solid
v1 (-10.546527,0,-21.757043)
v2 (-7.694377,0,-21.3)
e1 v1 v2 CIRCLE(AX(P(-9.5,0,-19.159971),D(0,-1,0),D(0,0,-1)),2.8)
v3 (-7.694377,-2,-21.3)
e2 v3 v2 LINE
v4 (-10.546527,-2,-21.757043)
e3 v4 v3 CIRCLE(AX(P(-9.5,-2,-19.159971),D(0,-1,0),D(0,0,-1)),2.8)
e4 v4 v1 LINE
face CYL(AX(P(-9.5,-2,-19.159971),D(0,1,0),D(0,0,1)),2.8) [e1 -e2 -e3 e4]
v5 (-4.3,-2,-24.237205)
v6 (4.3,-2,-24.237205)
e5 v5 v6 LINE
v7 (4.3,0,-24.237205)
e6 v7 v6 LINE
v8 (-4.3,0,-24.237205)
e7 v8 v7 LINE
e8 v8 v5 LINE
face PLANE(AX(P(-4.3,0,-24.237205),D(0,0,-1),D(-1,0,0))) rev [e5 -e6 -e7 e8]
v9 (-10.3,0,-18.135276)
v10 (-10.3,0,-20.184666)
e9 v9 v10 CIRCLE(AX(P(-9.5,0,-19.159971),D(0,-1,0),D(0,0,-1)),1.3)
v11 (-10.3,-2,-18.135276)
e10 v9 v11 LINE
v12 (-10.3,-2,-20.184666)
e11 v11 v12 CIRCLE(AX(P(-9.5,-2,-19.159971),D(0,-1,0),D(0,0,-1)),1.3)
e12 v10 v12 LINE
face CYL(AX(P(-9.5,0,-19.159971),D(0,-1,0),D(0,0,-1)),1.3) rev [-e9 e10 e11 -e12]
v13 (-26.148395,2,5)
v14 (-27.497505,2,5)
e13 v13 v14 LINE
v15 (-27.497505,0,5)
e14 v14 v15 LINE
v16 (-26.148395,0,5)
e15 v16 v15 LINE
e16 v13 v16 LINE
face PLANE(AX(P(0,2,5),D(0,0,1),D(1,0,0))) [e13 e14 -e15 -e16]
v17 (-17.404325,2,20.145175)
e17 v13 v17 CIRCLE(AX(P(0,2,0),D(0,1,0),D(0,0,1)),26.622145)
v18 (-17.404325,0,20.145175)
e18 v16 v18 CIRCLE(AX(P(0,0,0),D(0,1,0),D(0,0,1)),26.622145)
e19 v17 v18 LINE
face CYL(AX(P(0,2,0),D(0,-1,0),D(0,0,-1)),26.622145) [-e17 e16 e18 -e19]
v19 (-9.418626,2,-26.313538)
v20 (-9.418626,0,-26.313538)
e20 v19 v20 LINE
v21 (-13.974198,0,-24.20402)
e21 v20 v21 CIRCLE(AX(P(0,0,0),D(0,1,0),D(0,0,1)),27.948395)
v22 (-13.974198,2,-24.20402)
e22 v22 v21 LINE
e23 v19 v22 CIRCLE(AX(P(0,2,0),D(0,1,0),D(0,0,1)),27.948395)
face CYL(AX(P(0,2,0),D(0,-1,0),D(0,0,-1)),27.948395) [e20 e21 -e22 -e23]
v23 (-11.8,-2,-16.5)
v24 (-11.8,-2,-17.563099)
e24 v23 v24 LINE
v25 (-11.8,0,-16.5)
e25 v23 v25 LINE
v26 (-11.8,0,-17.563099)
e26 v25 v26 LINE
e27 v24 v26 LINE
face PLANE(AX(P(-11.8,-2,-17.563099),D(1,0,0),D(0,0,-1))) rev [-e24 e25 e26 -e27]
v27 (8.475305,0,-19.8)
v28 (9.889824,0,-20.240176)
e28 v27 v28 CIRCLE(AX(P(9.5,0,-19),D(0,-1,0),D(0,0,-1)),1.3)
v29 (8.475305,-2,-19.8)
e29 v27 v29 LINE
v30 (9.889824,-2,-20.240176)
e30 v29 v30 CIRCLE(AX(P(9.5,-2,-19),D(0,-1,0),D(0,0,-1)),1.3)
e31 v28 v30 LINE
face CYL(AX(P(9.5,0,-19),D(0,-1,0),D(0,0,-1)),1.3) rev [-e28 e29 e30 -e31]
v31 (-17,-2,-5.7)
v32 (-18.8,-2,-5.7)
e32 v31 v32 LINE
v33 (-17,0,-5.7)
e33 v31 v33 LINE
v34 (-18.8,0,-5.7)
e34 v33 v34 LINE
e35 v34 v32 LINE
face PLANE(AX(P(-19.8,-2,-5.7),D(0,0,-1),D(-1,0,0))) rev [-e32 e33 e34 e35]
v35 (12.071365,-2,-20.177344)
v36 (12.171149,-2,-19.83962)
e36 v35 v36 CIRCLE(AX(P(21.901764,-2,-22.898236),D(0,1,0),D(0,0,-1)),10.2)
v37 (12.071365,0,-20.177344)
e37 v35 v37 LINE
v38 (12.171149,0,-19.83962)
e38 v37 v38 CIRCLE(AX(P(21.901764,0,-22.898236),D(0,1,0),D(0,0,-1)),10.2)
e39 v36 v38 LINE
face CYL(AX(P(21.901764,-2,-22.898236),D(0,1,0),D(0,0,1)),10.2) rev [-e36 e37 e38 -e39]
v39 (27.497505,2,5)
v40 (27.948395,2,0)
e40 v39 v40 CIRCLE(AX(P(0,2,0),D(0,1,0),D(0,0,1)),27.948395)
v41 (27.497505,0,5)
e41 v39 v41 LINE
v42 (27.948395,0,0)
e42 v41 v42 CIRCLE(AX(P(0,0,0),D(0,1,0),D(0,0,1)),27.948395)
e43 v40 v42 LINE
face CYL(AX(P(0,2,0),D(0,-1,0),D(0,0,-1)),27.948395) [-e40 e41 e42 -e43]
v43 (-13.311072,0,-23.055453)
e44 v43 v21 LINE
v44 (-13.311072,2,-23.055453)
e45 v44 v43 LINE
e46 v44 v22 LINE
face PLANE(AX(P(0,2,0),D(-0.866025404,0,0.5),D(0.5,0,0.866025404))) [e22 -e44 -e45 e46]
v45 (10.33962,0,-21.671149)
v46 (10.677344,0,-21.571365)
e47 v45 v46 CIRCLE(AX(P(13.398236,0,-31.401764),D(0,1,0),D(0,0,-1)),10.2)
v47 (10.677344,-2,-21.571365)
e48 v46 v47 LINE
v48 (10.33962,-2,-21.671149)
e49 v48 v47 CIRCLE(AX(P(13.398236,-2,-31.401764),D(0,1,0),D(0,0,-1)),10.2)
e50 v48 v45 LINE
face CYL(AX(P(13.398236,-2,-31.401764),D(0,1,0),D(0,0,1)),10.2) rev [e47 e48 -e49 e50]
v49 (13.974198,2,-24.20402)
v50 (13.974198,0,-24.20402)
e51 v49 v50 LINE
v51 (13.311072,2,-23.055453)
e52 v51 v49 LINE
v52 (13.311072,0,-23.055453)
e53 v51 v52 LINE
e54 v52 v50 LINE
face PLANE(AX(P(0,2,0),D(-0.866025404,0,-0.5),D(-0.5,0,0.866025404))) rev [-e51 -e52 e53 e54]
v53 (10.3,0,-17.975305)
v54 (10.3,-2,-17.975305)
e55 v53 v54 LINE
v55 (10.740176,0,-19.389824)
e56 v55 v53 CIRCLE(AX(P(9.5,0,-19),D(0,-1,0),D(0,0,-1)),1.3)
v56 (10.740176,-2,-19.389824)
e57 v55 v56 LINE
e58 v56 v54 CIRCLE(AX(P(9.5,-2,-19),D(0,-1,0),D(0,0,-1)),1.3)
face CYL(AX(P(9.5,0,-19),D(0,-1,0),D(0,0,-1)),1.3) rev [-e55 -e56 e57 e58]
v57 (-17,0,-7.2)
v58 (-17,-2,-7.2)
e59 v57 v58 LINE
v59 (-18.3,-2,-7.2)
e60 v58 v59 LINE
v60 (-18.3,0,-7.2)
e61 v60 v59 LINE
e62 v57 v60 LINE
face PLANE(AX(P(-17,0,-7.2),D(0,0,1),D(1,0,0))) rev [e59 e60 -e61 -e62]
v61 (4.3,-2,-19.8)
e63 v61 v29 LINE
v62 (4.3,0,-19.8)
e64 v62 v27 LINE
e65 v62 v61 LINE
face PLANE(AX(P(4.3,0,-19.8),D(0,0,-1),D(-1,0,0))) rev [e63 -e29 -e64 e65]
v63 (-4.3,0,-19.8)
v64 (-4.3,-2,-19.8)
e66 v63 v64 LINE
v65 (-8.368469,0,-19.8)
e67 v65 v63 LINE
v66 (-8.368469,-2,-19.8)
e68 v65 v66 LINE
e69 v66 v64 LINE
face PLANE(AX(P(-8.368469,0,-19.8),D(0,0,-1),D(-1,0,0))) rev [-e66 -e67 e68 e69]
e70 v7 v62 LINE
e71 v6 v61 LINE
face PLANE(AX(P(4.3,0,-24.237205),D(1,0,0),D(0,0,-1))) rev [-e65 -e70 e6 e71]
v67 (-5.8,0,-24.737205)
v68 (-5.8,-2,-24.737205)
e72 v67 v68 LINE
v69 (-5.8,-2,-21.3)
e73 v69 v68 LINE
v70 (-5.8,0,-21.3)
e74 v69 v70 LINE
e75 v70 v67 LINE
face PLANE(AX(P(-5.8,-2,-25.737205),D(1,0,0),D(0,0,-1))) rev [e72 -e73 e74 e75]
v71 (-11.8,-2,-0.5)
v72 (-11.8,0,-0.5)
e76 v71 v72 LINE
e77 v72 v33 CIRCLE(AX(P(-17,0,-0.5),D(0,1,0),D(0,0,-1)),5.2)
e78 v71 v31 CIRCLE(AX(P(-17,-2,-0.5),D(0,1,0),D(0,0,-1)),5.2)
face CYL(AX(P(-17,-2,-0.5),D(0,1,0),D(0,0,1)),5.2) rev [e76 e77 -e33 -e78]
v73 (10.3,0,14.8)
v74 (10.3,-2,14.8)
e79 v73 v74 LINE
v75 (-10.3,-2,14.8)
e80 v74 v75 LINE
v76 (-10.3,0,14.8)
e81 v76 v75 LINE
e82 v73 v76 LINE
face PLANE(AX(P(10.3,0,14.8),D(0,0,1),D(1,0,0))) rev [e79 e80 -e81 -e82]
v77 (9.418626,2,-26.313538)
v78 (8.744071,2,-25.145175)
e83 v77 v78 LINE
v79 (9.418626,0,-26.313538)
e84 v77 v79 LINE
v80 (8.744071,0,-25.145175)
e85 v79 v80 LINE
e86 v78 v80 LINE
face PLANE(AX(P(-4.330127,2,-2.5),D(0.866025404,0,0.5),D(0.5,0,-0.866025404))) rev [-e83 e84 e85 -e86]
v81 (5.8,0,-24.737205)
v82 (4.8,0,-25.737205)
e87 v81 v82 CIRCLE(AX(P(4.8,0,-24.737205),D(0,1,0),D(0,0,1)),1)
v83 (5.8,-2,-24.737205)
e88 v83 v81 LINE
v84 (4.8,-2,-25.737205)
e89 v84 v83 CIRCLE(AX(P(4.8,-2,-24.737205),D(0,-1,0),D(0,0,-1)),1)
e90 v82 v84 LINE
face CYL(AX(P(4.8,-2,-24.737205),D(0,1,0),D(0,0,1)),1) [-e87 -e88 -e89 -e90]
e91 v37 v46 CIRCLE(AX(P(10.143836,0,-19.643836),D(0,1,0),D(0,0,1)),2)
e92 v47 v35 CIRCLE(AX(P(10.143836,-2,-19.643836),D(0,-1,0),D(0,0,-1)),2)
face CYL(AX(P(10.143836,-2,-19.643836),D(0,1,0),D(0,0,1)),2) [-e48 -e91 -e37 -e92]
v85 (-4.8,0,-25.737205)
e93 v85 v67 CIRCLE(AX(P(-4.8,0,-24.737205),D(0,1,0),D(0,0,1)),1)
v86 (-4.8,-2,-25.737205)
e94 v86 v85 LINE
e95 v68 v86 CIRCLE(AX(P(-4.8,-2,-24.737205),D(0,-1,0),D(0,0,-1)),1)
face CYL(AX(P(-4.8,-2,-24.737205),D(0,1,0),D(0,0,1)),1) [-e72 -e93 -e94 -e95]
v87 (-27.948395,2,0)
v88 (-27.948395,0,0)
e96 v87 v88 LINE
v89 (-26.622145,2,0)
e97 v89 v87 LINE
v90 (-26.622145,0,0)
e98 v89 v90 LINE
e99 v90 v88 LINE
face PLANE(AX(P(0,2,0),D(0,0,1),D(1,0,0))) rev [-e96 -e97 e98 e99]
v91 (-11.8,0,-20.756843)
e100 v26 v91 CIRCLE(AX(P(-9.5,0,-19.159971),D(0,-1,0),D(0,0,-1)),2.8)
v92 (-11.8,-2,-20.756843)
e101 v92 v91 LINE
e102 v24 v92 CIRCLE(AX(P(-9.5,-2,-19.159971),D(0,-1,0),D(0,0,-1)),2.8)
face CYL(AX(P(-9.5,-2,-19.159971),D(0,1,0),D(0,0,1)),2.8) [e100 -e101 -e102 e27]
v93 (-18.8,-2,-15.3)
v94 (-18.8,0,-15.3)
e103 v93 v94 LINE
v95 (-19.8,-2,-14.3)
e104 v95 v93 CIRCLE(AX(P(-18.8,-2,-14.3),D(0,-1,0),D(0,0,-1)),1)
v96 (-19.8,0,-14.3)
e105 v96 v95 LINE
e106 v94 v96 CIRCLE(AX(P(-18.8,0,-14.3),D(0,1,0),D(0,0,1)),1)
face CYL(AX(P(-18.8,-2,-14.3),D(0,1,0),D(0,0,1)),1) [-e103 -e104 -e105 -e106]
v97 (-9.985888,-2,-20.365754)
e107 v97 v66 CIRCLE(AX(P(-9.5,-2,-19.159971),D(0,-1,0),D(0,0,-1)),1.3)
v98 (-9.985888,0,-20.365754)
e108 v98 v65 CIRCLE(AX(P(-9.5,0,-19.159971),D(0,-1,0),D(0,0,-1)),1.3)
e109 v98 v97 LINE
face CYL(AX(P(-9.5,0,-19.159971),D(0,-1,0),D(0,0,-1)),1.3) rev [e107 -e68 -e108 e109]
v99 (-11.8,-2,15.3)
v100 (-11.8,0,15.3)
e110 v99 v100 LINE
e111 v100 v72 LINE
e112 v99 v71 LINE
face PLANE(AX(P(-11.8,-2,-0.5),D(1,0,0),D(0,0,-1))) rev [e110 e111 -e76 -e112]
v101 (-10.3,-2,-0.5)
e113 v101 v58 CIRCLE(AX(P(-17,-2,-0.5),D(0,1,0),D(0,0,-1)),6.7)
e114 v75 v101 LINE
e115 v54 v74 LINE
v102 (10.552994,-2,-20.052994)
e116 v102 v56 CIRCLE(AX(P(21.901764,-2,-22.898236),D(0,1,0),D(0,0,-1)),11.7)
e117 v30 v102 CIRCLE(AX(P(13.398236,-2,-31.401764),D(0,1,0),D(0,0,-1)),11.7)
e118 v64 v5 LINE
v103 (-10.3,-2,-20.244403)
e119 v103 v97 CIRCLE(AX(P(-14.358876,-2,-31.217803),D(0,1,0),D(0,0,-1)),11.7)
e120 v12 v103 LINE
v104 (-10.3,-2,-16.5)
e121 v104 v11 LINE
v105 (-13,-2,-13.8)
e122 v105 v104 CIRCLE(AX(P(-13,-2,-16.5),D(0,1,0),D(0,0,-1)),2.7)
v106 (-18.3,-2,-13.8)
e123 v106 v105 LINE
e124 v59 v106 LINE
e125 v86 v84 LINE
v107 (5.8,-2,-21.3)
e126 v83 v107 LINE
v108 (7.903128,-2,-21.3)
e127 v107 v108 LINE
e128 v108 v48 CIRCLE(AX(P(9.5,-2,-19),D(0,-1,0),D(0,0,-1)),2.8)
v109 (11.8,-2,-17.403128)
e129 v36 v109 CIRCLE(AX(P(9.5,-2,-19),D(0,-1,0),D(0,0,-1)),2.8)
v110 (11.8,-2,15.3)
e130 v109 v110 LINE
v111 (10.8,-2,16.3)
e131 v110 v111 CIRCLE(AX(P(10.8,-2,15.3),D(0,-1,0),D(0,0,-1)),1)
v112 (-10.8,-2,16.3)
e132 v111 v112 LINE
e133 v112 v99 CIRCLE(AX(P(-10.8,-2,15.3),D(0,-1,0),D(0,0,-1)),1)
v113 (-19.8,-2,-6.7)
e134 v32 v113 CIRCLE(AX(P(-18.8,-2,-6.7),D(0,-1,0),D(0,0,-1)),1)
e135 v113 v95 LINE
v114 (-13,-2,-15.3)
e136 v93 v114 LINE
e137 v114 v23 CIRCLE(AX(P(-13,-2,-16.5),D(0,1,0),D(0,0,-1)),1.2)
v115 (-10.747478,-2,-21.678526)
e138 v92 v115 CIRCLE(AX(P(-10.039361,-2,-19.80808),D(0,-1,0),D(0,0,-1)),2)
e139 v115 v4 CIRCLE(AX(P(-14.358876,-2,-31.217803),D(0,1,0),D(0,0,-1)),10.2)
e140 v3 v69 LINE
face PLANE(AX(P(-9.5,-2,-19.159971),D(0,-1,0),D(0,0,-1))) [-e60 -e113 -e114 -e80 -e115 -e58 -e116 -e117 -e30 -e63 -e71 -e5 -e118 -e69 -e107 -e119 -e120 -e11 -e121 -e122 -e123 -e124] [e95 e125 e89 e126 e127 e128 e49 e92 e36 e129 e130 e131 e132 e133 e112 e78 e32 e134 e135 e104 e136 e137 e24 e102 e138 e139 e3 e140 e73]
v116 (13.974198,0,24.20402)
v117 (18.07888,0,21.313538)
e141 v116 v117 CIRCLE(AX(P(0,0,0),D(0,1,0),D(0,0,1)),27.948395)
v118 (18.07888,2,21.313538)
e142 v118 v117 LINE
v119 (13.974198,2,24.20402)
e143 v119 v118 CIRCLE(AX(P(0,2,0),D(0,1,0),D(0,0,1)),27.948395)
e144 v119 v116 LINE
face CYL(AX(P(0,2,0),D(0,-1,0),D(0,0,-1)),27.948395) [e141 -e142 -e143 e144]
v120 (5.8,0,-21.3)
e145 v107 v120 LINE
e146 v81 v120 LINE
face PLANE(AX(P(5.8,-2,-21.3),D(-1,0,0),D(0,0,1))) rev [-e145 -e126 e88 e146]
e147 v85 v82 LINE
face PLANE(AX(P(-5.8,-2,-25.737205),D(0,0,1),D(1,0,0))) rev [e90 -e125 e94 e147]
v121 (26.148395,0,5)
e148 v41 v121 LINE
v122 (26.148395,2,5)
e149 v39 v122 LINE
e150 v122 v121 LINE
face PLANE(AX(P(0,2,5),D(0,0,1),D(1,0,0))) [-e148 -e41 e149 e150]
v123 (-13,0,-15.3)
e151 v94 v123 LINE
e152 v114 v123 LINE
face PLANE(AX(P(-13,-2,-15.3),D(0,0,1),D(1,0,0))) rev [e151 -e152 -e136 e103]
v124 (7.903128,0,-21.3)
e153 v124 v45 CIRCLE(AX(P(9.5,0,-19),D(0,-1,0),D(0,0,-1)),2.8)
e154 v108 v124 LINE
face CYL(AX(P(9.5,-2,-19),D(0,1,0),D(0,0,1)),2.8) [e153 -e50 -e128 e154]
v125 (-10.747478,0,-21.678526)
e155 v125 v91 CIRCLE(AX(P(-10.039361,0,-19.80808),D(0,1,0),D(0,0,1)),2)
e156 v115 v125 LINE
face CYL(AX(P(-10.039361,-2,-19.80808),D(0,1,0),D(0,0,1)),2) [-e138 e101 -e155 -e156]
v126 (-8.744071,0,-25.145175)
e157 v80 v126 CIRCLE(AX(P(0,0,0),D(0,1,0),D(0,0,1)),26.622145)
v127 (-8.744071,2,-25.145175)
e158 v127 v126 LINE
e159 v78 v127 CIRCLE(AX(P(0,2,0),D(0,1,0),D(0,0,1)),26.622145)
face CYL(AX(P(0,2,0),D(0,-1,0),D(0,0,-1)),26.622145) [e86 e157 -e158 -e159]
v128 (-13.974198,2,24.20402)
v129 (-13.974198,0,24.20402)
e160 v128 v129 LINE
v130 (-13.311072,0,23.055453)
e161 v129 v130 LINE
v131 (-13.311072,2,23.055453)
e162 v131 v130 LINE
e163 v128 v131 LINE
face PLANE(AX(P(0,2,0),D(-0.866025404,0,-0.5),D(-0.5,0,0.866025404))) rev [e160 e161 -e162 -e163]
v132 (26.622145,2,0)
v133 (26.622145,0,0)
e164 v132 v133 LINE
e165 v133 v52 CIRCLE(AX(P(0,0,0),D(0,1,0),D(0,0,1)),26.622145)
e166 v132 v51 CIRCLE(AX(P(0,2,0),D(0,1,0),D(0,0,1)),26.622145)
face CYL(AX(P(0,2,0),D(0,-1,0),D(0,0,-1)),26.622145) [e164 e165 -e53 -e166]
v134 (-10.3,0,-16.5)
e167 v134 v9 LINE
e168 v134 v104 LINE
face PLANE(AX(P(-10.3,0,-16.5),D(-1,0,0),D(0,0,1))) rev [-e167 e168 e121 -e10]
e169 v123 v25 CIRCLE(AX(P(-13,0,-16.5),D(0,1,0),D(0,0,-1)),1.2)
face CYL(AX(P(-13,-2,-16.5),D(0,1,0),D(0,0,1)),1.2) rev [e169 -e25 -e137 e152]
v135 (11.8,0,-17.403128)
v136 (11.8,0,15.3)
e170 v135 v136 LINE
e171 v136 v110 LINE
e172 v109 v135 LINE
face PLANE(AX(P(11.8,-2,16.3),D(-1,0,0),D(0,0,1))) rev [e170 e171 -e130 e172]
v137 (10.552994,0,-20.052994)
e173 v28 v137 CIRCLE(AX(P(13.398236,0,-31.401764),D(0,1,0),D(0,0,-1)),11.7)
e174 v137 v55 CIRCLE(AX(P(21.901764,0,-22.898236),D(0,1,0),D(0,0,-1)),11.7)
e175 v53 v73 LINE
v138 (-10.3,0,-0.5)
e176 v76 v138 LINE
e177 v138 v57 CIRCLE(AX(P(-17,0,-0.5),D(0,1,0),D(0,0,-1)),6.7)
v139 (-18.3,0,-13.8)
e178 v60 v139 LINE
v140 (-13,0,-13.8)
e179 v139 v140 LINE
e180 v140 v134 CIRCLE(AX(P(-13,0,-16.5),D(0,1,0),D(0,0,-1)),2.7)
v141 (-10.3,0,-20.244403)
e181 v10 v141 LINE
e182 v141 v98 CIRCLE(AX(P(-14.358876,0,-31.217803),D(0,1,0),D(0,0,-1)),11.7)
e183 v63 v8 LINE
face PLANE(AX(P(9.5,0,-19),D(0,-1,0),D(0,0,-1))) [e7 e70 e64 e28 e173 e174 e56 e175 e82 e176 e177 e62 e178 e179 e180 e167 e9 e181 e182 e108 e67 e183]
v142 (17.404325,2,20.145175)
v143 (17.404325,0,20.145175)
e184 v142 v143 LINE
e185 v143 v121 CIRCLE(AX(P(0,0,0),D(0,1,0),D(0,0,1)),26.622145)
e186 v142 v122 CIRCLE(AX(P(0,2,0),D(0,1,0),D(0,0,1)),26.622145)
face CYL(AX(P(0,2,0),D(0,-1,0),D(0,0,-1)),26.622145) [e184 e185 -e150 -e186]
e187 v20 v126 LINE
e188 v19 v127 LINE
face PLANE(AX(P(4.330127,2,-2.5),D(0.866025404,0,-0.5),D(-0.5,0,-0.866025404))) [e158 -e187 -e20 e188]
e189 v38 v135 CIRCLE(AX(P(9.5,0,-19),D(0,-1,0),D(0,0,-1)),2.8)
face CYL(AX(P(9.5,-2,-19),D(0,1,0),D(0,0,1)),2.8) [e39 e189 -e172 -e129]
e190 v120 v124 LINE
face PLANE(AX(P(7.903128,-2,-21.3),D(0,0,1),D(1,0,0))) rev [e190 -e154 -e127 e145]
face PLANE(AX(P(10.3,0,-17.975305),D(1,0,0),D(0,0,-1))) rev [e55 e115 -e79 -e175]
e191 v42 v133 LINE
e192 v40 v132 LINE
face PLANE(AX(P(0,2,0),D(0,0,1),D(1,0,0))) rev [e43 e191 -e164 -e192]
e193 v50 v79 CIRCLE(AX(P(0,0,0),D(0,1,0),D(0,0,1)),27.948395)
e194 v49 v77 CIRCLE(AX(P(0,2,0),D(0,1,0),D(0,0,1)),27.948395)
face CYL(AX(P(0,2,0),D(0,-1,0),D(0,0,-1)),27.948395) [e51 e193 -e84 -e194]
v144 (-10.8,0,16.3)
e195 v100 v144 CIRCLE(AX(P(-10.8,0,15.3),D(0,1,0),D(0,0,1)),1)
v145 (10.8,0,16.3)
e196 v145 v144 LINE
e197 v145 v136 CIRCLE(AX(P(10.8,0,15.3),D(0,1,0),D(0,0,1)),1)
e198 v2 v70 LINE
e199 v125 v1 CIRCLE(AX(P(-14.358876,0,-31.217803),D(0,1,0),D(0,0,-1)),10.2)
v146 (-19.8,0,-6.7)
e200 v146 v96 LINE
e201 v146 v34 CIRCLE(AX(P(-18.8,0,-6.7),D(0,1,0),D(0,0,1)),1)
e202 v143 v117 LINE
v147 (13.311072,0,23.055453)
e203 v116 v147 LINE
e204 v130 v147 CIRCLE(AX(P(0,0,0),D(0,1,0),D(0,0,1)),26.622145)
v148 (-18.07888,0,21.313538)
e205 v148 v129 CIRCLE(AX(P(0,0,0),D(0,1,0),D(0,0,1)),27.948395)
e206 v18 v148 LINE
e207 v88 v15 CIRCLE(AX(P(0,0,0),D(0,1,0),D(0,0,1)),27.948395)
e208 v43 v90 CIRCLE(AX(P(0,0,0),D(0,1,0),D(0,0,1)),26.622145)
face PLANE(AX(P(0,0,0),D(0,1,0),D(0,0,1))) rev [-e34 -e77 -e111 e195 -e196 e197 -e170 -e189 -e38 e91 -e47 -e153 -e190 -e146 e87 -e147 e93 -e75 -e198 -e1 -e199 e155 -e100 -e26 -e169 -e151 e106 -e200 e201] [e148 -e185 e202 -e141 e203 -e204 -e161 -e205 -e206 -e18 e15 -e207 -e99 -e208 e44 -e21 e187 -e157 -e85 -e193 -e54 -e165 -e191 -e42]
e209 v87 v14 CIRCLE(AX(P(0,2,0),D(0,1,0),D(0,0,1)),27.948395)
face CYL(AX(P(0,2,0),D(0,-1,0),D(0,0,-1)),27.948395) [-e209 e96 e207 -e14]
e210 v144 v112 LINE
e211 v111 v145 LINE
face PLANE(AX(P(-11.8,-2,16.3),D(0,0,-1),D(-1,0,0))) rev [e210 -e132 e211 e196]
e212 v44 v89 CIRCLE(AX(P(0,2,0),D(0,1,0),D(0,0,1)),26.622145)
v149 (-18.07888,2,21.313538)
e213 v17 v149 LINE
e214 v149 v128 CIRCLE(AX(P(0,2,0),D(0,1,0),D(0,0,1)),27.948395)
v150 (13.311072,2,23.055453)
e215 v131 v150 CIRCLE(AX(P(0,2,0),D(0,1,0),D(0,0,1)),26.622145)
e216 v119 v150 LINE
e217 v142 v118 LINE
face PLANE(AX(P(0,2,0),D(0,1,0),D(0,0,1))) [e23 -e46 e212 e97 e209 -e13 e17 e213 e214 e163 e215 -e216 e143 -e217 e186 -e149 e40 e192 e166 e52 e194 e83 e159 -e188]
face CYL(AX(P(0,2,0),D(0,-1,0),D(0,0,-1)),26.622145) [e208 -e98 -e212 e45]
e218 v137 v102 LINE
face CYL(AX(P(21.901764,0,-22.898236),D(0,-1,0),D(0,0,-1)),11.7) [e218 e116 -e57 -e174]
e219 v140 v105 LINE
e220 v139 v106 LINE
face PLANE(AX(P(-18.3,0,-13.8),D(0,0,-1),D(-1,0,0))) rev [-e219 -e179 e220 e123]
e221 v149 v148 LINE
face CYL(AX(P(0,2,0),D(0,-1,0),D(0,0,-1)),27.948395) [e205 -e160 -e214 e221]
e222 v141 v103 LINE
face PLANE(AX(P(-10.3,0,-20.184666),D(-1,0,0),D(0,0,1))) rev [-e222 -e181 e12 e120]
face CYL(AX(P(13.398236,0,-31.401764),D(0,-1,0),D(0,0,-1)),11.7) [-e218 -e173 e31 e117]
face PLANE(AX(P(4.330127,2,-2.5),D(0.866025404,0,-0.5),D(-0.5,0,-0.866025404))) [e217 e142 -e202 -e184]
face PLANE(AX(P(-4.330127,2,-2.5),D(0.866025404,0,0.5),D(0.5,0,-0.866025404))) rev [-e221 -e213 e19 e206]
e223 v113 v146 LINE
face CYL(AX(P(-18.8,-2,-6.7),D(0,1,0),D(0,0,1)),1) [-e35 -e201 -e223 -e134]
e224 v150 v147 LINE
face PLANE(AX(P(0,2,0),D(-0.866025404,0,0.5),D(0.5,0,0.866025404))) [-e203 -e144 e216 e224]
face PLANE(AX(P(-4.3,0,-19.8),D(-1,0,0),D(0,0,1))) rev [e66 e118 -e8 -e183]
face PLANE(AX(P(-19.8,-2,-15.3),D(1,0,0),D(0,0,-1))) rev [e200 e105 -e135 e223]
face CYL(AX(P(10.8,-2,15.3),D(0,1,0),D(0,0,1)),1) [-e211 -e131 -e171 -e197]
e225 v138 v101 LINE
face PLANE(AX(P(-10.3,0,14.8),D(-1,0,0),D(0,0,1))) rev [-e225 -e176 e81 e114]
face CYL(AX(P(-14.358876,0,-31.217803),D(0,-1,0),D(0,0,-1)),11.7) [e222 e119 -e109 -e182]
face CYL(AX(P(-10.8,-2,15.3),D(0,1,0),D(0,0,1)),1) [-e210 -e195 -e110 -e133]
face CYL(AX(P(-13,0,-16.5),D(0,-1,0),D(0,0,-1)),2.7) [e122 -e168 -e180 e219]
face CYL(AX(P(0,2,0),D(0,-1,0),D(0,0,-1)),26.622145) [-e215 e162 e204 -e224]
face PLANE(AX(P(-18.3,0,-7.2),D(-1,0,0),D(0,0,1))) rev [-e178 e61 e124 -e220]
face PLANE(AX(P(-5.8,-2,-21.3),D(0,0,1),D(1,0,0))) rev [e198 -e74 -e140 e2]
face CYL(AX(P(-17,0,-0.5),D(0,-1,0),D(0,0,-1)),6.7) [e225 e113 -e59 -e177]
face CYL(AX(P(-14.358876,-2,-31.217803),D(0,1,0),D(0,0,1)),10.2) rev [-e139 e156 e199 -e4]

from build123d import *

# Parameters (mm, degrees)
BOSS_EXTRUDE1_DEPTH = 2
BOSS_EXTRUDE2_DEPTH = 2
CUT_EXTRUDE1_DEPTH  = 2
FILLET1_R           = 2
FILLET2_R           = 1


with BuildPart() as part:
    # Sketch1 → Boss-Extrude1 (new body)
    with BuildSketch(Plane(origin=(0, 0, 0), x_dir=(1, 0, 0), z_dir=(0, 1, 0))):
        with BuildLine():
            Line((13.311072252, 23.055453444), (13.974197662, 24.204020346))
            ThreePointArc((13.974197662, 24.204020346), (11.743873388, 25.361274397), (9.418625663, 26.313538185))
            Line((9.418625663, 26.313538185), (8.744070643, 25.145174619))
            ThreePointArc((8.744070643, 25.145174619), (0, 26.622144504), (-8.744070643, 25.145174619))
            Line((-8.744070643, 25.145174619), (-9.418625663, 26.313538185))
            ThreePointArc((-9.418625663, 26.313538185), (-11.743873388, 25.361274397), (-13.974197662, 24.204020346))
            Line((-13.974197662, 24.204020346), (-13.311072252, 23.055453444))
            ThreePointArc((-13.311072252, 23.055453444), (-23.055453444, 13.311072252), (-26.622144504, 0))
            Line((-26.622144504, 0), (-27.948395324, 0))
            ThreePointArc((-27.948395324, 0), (-27.835444594, -2.510144506), (-27.497505363, -5))
            Line((-27.497505363, -5), (-26.148395324, -5))
            ThreePointArc((-26.148395324, -5), (-23.055453444, -13.311072252), (-17.404324681, -20.145174619))
            Line((-17.404324681, -20.145174619), (-18.0788797, -21.313538185))
            ThreePointArc((-18.0788797, -21.313538185), (-16.091571206, -22.851129891), (-13.974197662, -24.204020346))
            Line((-13.974197662, -24.204020346), (-13.311072252, -23.055453444))
            ThreePointArc((-13.311072252, -23.055453444), (0, -26.622144504), (13.311072252, -23.055453444))
            Line((13.311072252, -23.055453444), (13.974197662, -24.204020346))
            ThreePointArc((13.974197662, -24.204020346), (16.091571206, -22.851129891), (18.0788797, -21.313538185))
            Line((18.0788797, -21.313538185), (17.404324681, -20.145174619))
            ThreePointArc((17.404324681, -20.145174619), (23.055453444, -13.311072252), (26.148395324, -5))
            Line((26.148395324, -5), (27.497505363, -5))
            ThreePointArc((27.497505363, -5), (27.835444594, -2.510144506), (27.948395324, 0))
            Line((27.948395324, 0), (26.622144504, 0))
            ThreePointArc((26.622144504, 0), (23.055453444, 13.311072252), (13.311072252, 23.055453444))
        make_face()
    extrude(amount=BOSS_EXTRUDE1_DEPTH)

    # Sketch2 → Boss-Extrude2 (add)
    with BuildSketch(Plane.XZ):
        with BuildLine():
            Line((-5.8, -25.737204514), (5.8, -25.737204514))
            Line((5.8, -25.737204514), (5.8, -21.3))
            Line((5.8, -21.3), (7.903128058, -21.3))
            ThreePointArc((7.903128058, -21.3), (9.07834188, -21.768068718), (10.339619988, -21.671149242))
            ThreePointArc((10.339619988, -21.671149242), (11.075305639, -21.469795949), (11.823980776, -21.323980776))
            ThreePointArc((11.823980776, -21.323980776), (11.969795949, -20.575305639), (12.171149242, -19.839619988))
            ThreePointArc((12.171149242, -19.839619988), (12.268068718, -18.57834188), (11.8, -17.403128058))
            Line((11.8, -17.403128058), (11.8, 16.3))
            Line((11.8, 16.3), (-11.8, 16.3))
            Line((-11.8, 16.3), (-11.8, -0.5))
            ThreePointArc((-11.8, -0.5), (-13.323044738, -4.176955262), (-17, -5.7))
            Line((-17, -5.7), (-19.8, -5.7))
            Line((-19.8, -5.7), (-19.8, -15.3))
            Line((-19.8, -15.3), (-13, -15.3))
            ThreePointArc((-13, -15.3), (-12.151471863, -15.651471863), (-11.8, -16.5))
            Line((-11.8, -16.5), (-11.8, -17.563099043))
            ThreePointArc((-11.8, -17.563099043), (-12.3, -19.159970985), (-11.8, -20.756842927))
            Line((-11.8, -20.756842927), (-11.8, -21.343991953))
            ThreePointArc((-11.8, -21.343991953), (-11.166576007, -21.530222711), (-10.546527145, -21.757042593))
            ThreePointArc((-10.546527145, -21.757042593), (-9.056966413, -21.924699044), (-7.694376613, -21.3))
            Line((-7.694376613, -21.3), (-5.8, -21.3))
            Line((-5.8, -21.3), (-5.8, -25.737204514))
        make_face()
    extrude(amount=BOSS_EXTRUDE2_DEPTH)

    # Sketch4 → Cut-Extrude1 (cut)
    with BuildSketch(Plane.XZ.offset(2)):
        with BuildLine():
            Line((-4.3, -19.8), (-4.3, -24.237204514))
            Line((-4.3, -24.237204514), (4.3, -24.237204514))
            Line((4.3, -24.237204514), (4.3, -19.8))
            Line((4.3, -19.8), (8.475304923, -19.8))
            ThreePointArc((8.475304923, -19.8), (9.113730299, -20.241287927), (9.889823566, -20.240176434))
            ThreePointArc((9.889823566, -20.240176434), (10.220030244, -20.141701714), (10.552993589, -20.052993589))
            ThreePointArc((10.552993589, -20.052993589), (10.641701714, -19.720030244), (10.740176434, -19.389823566))
            ThreePointArc((10.740176434, -19.389823566), (10.741287927, -18.613730299), (10.3, -17.975304923))
            Line((10.3, -17.975304923), (10.3, 14.8))
            Line((10.3, 14.8), (-10.3, 14.8))
            Line((-10.3, 14.8), (-10.3, -0.5))
            ThreePointArc((-10.3, -0.5), (-12.262384566, -5.237615434), (-17, -7.2))
            Line((-17, -7.2), (-18.3, -7.2))
            Line((-18.3, -7.2), (-18.3, -13.8))
            Line((-18.3, -13.8), (-13, -13.8))
            ThreePointArc((-13, -13.8), (-11.090811691, -14.590811691), (-10.3, -16.5))
            Line((-10.3, -16.5), (-10.3, -18.135275908))
            ThreePointArc((-10.3, -18.135275908), (-10.8, -19.159970985), (-10.3, -20.184666062))
            Line((-10.3, -20.184666062), (-10.3, -20.244402637))
            ThreePointArc((-10.3, -20.244402637), (-10.1425072, -20.303948315), (-9.985887603, -20.365754231))
            ThreePointArc((-9.985887603, -20.365754231), (-9.070775843, -20.387067812), (-8.368468799, -19.8))
            Line((-8.368468799, -19.8), (-4.3, -19.8))
        make_face()
    extrude(amount=-CUT_EXTRUDE1_DEPTH, mode=Mode.SUBTRACT)

    # Fillet1
    # the kernel refuses this fillet: 2 mm, written as the material it takes off along each edge
    with BuildSketch(Plane(origin=(11.823980776, 0, -21.323980776), x_dir=(0.21089533444820466, 0, 0.977508648508022), z_dir=(0, -1, 0))) as fillet1_piece_1:
        with BuildLine():
            CenterArc((1.288021457, 1.996690902), FILLET1_R, 207.646032977, 59.057586609)
            Line((-0.48364068, 1.068675131), (-0.519073923, 1.050114816))
            ThreePointArc((-0.519073923, 1.050114816), (-0.262887012, 0.524803612), (-0.037329873, -0.014369433))
            Line((-0.037329873, -0.014369433), (0.002300038, -0.039933818))
            ThreePointArc((0.002300038, -0.039933818), (0.586509771, -0.023123602), (1.170719503, -0.039933818))
            Line((1.170719503, -0.039933818), (1.173019541, 0))
        make_face()
    extrude(amount=4.932548853, mode=Mode.SUBTRACT)
    with BuildSketch(Plane(origin=(-11.8, 0, -21.343991953), x_dir=(0.9530196078830334, 0, -0.3029086116149048), z_dir=(0, -1, 0))) as fillet1_piece_2:
        with BuildLine():
            CenterArc((1.212682202, 1.99706697), FILLET1_R, 225.951474685, 40.945152222)
            Line((-0.177852496, 0.559564534), (-0.20566319, 0.530814485))
            ThreePointArc((-0.20566319, 0.530814485), (-0.127047032, 0.267665923), (-0.038120784, -0.012116344))
            Line((-0.038120784, -0.012116344), (0.002165504, -0.039941339))
            ThreePointArc((0.002165504, -0.039941339), (0.552203503, -0.025041546), (1.102241502, -0.039941339))
            Line((1.102241502, -0.039941339), (1.104407006, 0))
        make_face()
    extrude(amount=4.761017514, mode=Mode.SUBTRACT)

    # Fillet2
    fillet2_edges = [part.edges().sort_by_distance(p)[0] for p in [
        (-5.8, -1, -25.737204514),
        (5.8, -1, -25.737204514),
        (11.8, -1, 16.3),
        (-11.8, -1, 16.3),
        (-19.8, -1, -5.7),
        (-19.8, -1, -15.3),
    ]]
    fillet(fillet2_edges, radius=FILLET2_R)


solid = part.part
